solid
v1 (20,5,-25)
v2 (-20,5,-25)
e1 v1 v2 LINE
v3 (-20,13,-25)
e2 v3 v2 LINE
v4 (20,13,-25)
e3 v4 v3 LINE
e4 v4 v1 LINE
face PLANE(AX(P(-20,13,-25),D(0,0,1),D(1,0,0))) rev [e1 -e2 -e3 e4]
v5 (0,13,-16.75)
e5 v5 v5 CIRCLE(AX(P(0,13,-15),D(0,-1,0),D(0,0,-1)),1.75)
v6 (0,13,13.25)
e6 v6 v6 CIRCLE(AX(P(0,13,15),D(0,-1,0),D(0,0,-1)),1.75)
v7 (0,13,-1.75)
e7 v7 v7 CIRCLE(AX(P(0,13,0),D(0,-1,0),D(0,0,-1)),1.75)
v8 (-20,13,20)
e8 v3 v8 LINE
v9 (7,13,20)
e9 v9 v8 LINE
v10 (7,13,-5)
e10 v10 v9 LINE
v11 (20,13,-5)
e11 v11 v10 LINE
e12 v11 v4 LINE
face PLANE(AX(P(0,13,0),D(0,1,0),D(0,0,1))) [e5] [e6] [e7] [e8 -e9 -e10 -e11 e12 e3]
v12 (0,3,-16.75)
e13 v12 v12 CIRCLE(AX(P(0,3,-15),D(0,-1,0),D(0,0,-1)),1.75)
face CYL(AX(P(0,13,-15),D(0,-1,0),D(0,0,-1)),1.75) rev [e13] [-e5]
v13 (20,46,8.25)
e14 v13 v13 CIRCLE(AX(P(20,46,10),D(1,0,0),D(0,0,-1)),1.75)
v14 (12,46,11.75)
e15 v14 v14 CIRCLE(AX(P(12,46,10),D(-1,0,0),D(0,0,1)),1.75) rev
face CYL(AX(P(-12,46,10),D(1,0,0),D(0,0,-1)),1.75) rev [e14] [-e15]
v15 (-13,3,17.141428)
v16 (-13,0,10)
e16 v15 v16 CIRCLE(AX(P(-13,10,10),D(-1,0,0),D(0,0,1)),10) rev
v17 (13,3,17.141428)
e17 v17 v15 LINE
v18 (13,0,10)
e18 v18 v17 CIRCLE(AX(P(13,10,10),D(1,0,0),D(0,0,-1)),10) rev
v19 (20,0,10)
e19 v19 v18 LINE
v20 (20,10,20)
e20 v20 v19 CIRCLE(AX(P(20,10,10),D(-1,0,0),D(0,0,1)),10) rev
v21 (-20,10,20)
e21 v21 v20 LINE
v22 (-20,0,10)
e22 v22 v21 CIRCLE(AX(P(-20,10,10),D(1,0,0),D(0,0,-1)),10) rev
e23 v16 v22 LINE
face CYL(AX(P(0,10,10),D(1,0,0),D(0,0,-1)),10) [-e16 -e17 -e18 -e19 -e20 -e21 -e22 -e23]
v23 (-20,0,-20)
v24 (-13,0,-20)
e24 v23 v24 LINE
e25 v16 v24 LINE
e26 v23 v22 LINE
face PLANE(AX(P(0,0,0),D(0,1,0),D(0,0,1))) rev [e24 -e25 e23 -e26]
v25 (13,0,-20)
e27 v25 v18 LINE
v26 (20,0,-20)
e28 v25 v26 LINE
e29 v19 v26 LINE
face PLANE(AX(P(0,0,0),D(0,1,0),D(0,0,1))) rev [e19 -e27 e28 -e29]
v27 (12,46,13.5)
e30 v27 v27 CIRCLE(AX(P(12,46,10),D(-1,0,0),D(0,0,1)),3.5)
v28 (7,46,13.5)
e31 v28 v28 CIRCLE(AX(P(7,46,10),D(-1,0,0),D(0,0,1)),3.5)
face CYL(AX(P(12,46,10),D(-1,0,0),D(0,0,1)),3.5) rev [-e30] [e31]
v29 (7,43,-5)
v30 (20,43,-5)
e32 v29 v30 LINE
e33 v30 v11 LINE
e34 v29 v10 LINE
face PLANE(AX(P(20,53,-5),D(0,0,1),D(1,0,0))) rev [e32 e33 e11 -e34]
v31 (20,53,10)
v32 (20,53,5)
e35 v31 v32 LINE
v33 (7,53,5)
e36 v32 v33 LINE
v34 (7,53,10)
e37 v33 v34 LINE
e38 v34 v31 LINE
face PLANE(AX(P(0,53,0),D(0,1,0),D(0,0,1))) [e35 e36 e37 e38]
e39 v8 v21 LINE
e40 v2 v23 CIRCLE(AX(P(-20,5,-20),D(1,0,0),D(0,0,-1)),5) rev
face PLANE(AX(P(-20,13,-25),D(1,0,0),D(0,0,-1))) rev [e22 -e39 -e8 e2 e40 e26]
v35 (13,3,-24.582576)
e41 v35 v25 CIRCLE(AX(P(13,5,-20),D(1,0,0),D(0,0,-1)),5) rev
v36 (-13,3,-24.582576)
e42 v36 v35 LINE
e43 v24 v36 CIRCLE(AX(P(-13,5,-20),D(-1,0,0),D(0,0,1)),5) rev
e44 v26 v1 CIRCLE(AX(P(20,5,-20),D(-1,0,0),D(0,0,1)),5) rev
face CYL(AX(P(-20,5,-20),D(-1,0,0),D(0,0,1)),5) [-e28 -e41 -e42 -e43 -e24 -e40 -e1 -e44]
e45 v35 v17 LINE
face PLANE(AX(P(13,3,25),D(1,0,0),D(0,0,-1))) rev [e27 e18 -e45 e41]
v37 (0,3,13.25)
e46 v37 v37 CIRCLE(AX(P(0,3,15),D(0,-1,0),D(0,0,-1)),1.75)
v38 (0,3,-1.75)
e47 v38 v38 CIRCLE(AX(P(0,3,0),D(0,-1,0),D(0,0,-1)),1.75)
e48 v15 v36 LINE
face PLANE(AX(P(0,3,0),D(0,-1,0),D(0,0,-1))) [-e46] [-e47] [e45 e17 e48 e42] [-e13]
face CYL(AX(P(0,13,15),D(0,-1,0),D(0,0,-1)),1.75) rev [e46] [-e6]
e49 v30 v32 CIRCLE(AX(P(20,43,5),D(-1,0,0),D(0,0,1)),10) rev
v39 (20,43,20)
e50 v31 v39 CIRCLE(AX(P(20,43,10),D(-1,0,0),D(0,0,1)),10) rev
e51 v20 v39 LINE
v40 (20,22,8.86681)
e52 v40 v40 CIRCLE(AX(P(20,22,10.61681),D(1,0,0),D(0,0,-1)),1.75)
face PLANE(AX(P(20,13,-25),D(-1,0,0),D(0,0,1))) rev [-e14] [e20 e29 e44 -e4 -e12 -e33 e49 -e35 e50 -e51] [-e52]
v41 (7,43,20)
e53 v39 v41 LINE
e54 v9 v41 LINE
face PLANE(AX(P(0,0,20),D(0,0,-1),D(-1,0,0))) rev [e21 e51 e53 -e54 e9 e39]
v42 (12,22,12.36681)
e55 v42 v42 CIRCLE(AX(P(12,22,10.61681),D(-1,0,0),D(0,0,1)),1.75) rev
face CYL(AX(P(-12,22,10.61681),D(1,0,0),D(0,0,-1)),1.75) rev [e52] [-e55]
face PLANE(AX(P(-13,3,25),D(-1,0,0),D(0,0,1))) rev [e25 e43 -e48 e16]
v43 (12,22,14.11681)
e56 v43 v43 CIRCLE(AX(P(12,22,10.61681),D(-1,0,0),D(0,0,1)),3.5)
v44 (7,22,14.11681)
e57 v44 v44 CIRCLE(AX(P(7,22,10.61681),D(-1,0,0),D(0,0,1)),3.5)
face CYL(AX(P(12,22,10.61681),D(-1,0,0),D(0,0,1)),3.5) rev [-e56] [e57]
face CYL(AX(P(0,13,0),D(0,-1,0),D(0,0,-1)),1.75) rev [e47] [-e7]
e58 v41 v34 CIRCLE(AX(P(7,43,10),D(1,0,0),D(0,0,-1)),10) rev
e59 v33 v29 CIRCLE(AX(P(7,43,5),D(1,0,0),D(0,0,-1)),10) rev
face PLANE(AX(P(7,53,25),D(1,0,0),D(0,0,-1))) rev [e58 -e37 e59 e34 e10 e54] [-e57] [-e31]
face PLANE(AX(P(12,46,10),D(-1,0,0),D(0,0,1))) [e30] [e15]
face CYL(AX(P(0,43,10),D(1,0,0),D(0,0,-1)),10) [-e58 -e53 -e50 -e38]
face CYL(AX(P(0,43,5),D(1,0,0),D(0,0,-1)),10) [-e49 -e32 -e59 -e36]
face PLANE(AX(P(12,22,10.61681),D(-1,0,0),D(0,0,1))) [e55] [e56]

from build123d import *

# Parameters (mm, degrees)
SKETCH1_W           = 40
SKETCH1_H           = 50
BOSS_EXTRUDE1_DEPTH = 13
SKETCH2_W           = 13
SKETCH2_H           = 30
BOSS_EXTRUDE2_DEPTH = 40
SKETCH3_R           = 1.75
CUT_EXTRUDE1_DEPTH  = 32
SKETCH4_W           = 26
SKETCH4_H           = 50
CUT_EXTRUDE2_DEPTH  = 3
SKETCH5_R           = 1.75
CUT_EXTRUDE3_DEPTH  = 10
SKETCH6_W           = 40
SKETCH6_H           = 53
CUT_EXTRUDE4_DEPTH  = 5
FILLET1_R           = 10
FILLET2_R           = 10
FILLET3_R           = 10
FILLET4_R           = 5
SKETCH7_R           = 3.5
CUT_EXTRUDE5_DEPTH  = 5


with BuildPart() as part:
    # Sketch1 → Boss-Extrude1 (new body)
    with BuildSketch(Plane(origin=(0, 0, 0), x_dir=(1, 0, 0), z_dir=(0, 1, 0))):
        Rectangle(SKETCH1_W, SKETCH1_H)
    extrude(amount=BOSS_EXTRUDE1_DEPTH)

    # Sketch2 → Boss-Extrude2 (add)
    with BuildSketch(Plane(origin=(0, 13, 0), x_dir=(1, 0, 0), z_dir=(0, 1, 0))):
        with Locations((13.5, -10)):
            Rectangle(SKETCH2_W, SKETCH2_H)
    extrude(amount=BOSS_EXTRUDE2_DEPTH)

    # Sketch3 → Cut-Extrude1 (cut)
    with BuildSketch(Plane(origin=(20, 0, 0), x_dir=(0, 0, -1), z_dir=(1, 0, 0))):
        with Locations((-10, 46)):
            Circle(SKETCH3_R)
        with Locations((-10.616810137, 22)):
            Circle(SKETCH3_R)
    extrude(amount=-CUT_EXTRUDE1_DEPTH, mode=Mode.SUBTRACT)

    # Sketch4 → Cut-Extrude2 (cut)
    with BuildSketch(Plane(origin=(0, 0, 0), x_dir=(-1, 0, 0), z_dir=(0, -1, 0))):
        Rectangle(SKETCH4_W, SKETCH4_H)
    extrude(amount=-CUT_EXTRUDE2_DEPTH, mode=Mode.SUBTRACT)

    # Sketch5 → Cut-Extrude3 (cut)
    with BuildSketch(Plane(origin=(0, 3, 0), x_dir=(-1, 0, 0), z_dir=(0, -1, 0))):
        with Locations(Location((0, 0, 0), (0, 0, 90))):
            Circle(SKETCH5_R)
        with Locations(Location((0, -15, 0), (0, 0, 90))):
            Circle(SKETCH5_R)
        with Locations(Location((0, 15, 0), (0, 0, 90))):
            Circle(SKETCH5_R)
    extrude(amount=-CUT_EXTRUDE3_DEPTH, mode=Mode.SUBTRACT)

    # Sketch6 → Cut-Extrude4 (cut)
    with BuildSketch(Plane.XY.offset(25)):
        with Locations((0, 26.5)):
            Rectangle(SKETCH6_W, SKETCH6_H)
    extrude(amount=-CUT_EXTRUDE4_DEPTH, mode=Mode.SUBTRACT)

    # Fillet1
    fillet1_edges = [part.edges().sort_by_distance(p)[0] for p in [
        (13.5, 53, 20),
    ]]
    fillet(fillet1_edges, radius=FILLET1_R)

    # Fillet2
    fillet2_edges = [part.edges().sort_by_distance(p)[0] for p in [
        (13.5, 53, -5),
    ]]
    fillet(fillet2_edges, radius=FILLET2_R)

    # Fillet3
    fillet3_edges = [part.edges().sort_by_distance(p)[0] for p in [
        (-16.5, 0, 20),
    ]]
    fillet(fillet3_edges, radius=FILLET3_R)

    # Fillet4
    fillet4_edges = [part.edges().sort_by_distance(p)[0] for p in [
        (-16.5, 0, -25),
    ]]
    fillet(fillet4_edges, radius=FILLET4_R - 0.0001)  # a hair under: the kernel refuses the full size

    # Sketch7 → Cut-Extrude5 (cut)
    with BuildSketch(Plane.ZY.offset(-7)):
        with Locations((10.616810137, 22)):
            Circle(SKETCH7_R)
        with Locations((10, 46)):
            Circle(SKETCH7_R)
    extrude(amount=-CUT_EXTRUDE5_DEPTH, mode=Mode.SUBTRACT)


solid = part.part
